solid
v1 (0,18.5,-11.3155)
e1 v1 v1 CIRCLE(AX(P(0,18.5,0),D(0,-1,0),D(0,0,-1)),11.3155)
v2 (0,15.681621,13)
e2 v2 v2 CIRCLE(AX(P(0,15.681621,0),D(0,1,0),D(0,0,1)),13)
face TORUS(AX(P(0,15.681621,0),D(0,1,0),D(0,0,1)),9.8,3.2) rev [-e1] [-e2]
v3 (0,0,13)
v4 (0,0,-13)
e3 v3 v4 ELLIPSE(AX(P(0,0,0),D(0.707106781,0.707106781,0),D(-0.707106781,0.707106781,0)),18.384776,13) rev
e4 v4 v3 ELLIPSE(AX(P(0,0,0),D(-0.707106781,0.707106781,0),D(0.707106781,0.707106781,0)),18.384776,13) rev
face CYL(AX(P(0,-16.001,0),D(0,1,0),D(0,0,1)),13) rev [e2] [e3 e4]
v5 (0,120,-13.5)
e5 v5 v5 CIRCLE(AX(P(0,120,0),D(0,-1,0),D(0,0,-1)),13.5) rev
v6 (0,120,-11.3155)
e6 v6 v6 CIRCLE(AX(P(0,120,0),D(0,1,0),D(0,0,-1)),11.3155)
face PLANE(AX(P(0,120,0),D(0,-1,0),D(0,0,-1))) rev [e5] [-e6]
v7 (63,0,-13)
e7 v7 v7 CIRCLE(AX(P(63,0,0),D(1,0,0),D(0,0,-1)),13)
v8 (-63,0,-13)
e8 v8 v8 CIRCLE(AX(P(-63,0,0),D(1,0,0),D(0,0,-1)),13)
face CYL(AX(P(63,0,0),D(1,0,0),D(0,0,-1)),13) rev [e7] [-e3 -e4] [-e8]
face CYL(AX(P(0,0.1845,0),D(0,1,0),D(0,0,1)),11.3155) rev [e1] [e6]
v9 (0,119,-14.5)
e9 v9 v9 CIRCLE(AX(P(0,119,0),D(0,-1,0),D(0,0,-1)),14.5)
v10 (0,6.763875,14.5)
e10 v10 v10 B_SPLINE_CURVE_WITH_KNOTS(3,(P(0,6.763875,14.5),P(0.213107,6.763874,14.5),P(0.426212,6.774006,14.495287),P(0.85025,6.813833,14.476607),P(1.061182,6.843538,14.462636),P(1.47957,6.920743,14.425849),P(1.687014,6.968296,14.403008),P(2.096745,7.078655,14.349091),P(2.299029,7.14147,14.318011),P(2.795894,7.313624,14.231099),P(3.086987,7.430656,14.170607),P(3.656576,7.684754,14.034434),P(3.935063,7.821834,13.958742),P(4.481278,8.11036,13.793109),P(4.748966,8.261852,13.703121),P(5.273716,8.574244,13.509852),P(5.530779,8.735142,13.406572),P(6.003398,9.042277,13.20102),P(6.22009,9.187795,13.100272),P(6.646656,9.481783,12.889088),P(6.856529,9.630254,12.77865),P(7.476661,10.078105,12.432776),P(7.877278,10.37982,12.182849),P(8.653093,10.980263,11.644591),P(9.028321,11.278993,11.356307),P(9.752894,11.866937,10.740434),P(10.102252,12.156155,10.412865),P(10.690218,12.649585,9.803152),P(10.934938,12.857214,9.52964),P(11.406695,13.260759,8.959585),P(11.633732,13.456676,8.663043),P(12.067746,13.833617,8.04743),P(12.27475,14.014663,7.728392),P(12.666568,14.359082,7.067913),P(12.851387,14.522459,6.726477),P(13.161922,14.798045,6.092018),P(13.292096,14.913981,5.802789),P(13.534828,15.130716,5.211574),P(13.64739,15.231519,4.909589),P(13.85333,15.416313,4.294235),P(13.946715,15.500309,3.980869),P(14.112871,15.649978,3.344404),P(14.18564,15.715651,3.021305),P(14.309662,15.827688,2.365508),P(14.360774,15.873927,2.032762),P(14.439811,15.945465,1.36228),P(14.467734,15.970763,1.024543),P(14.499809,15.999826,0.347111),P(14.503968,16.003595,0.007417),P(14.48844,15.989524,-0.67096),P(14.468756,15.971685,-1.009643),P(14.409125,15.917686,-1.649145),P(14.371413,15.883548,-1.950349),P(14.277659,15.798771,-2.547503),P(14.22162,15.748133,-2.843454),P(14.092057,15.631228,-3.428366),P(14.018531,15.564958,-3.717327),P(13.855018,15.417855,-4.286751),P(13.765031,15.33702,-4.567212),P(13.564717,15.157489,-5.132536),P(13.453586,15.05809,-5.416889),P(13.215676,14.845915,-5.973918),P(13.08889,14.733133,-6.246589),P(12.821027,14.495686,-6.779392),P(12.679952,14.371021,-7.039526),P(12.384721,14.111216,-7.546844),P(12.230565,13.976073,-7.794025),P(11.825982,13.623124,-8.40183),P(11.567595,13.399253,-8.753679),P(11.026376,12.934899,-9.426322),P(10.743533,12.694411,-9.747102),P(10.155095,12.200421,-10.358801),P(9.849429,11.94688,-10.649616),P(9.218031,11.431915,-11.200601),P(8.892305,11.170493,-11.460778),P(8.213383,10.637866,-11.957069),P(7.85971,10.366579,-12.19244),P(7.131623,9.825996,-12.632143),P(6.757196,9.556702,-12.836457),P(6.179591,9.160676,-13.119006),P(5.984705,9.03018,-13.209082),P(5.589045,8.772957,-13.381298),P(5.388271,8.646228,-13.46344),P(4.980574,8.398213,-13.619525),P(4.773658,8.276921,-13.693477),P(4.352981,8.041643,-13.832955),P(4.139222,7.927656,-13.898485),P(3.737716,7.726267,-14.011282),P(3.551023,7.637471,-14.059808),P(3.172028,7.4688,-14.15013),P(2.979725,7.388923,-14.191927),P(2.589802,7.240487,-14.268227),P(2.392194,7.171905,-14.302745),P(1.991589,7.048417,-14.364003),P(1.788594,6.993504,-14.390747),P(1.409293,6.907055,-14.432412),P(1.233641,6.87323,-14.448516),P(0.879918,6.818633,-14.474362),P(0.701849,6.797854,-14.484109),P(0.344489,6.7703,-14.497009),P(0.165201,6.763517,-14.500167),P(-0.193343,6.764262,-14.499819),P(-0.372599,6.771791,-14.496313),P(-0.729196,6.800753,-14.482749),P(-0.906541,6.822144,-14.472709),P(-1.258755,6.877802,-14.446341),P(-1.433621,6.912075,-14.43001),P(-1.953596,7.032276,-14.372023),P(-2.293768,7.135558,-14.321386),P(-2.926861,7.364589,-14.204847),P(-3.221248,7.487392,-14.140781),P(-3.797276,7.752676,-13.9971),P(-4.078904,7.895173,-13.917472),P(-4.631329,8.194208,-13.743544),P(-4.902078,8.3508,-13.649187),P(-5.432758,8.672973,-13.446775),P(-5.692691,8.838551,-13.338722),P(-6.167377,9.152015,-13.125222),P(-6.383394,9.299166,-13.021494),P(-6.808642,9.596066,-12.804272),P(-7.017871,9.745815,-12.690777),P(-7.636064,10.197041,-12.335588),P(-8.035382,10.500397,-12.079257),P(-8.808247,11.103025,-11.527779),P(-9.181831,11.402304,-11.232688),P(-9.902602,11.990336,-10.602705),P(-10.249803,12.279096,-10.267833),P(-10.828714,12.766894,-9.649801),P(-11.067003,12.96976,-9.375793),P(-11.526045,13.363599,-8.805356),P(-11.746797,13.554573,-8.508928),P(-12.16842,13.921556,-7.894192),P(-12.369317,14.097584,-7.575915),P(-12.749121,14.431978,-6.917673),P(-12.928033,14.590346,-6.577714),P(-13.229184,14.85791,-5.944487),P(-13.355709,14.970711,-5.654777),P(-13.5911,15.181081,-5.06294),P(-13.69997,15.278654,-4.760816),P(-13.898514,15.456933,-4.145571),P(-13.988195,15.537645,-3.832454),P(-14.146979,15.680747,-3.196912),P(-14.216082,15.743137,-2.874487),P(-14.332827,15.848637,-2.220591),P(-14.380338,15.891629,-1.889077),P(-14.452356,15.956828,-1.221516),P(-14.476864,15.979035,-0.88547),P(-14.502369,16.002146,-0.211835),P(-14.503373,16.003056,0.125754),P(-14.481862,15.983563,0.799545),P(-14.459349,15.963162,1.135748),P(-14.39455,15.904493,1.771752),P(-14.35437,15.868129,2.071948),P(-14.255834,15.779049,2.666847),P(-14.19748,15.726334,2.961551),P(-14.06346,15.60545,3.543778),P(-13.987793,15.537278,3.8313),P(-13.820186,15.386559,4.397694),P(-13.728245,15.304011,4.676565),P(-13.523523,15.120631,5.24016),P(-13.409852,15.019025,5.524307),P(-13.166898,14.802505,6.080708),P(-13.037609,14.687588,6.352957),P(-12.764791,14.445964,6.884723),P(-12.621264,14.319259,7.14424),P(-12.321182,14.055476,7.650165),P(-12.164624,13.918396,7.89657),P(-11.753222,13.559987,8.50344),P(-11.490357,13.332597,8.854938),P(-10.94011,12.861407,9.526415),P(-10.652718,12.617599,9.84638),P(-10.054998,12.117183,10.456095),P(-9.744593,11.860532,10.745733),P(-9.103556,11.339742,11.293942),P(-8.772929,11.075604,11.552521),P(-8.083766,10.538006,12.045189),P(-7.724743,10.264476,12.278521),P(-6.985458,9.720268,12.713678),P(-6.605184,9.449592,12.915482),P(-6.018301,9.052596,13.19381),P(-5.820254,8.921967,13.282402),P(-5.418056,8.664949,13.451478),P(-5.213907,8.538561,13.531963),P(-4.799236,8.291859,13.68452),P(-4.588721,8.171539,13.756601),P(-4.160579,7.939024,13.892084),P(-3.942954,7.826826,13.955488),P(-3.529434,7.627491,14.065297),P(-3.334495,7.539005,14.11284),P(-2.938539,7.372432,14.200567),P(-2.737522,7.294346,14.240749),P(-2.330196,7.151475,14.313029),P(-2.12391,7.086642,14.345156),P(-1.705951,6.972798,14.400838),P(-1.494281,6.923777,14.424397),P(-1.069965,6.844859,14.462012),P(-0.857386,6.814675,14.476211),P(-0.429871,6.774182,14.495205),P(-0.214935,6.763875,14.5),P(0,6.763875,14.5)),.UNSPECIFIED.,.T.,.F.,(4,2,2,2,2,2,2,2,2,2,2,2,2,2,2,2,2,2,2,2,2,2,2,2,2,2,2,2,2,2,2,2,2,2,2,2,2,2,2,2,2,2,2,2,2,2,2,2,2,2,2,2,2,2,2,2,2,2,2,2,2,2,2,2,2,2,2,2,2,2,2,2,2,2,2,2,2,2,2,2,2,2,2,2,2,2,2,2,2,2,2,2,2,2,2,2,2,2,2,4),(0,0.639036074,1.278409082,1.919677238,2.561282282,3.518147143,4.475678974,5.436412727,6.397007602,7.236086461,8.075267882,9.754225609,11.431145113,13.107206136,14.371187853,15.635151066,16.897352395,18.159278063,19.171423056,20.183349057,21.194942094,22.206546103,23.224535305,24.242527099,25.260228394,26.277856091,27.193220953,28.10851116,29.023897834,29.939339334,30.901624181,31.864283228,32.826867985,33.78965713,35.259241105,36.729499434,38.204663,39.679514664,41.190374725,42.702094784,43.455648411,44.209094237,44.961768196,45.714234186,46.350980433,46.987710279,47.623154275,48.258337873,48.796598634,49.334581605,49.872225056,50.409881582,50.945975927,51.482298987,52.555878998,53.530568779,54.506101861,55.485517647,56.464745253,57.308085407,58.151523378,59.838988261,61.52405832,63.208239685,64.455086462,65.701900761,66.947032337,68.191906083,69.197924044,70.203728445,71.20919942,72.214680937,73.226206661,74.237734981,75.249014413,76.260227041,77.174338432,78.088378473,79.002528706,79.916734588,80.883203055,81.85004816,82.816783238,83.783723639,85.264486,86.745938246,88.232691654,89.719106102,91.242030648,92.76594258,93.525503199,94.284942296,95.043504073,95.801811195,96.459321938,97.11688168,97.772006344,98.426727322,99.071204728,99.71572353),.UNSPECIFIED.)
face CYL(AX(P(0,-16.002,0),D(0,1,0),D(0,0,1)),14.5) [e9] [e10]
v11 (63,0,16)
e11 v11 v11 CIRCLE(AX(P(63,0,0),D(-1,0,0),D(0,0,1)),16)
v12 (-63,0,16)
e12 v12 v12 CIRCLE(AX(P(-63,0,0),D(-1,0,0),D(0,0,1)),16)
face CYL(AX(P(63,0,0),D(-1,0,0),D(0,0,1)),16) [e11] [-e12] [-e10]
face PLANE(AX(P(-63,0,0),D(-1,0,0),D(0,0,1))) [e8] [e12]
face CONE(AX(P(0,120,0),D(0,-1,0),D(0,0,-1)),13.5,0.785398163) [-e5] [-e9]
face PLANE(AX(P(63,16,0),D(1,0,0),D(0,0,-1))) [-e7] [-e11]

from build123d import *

# Parameters (mm, degrees)
SKETCH1_W                = 126
SKETCH1_H                = 16
M22_CLEARANCE_HOLE1_D    = 26
BOSS_EXTRUDE1_REACH      = 152.735
BOSS_EXTRUDE1_END_RADIUS = 16
SKETCH4_R                = 14.5
CUT_EXTRUDE1_REACH       = 122.529
CUT_EXTRUDE1_END_RADIUS  = 13
SKETCH5_R                = 13
SKETCH6_R                = 9.097381441
CUT_EXTRUDE2_DEPTH       = 0.4
CUT_EXTRUDE2_DRAFT       = -70
SKETCH7_R                = 7.998390473
CUT_EXTRUDE3_DEPTH       = 1.26
CUT_EXTRUDE3_DRAFT       = 50
SKETCH8_R                = 9.5
CUT_EXTRUDE4_DEPTH       = 30.5245
SKETCH9_R                = 11.3155
CUT_EXTRUDE5_DEPTH       = 119.8155
CHAMFER1_SIZE            = 1
FILLET1_R                = 3.2


with BuildPart() as part:
    # Sketch1 → Revolve1 (revolve)
    with BuildSketch(Plane(origin=(0, 0, 0), x_dir=(-1, 0, 0), z_dir=(0, 0, -1)), mode=Mode.PRIVATE) as revolve1_sk:
        with Locations((0, 8)):
            Rectangle(SKETCH1_W, SKETCH1_H)
    revolve(revolve1_sk.sketch.rotate(Axis((63, 0, 0), (-1, 0, 0)), 270), axis=Axis((63, 0, 0), (-1, 0, 0)))

    # M22 Clearance Hole1 (through all)
    with Locations(Plane(origin=(63, 0, 0), x_dir=(0, 0, -1), z_dir=(1, 0, 0))):
        with Locations((0, 0)):
            Hole(M22_CLEARANCE_HOLE1_D / 2)

    # Boss-Extrude1: up to this cylinder (the profile starts outside it)
    boss_extrude1_end = Plane(origin=(0, 0, 0), z_dir=(-1, 0, 0)) * Cylinder(BOSS_EXTRUDE1_END_RADIUS, 338.47, mode=Mode.PRIVATE)
    # Sketch4 → Boss-Extrude1 (add, up to the surface)
    with BuildSketch(Plane(origin=(0, 120, 0), x_dir=(1, 0, 0), z_dir=(0, 1, 0)), mode=Mode.PRIVATE) as boss_extrude1_sk1:
        with Locations(Location((0, 0, 0), (0, 0, 270))):
            Circle(SKETCH4_R)
    boss_extrude1_tool1 = extrude(boss_extrude1_sk1.sketch, amount=-BOSS_EXTRUDE1_REACH, mode=Mode.PRIVATE) - boss_extrude1_end
    add(boss_extrude1_tool1.solids().sort_by_distance((0, 120, 0))[0])

    # Cut-Extrude1: up to this cylinder (the profile starts outside it)
    cut_extrude1_end = Plane(origin=(0, 0, 0), z_dir=(1, 0, 0)) * Cylinder(CUT_EXTRUDE1_END_RADIUS, 272.058, mode=Mode.PRIVATE)
    # Sketch5 → Cut-Extrude1 (cut, up to the surface)
    with BuildSketch(Plane(origin=(0, 18.5, 0), x_dir=(1, 0, 0), z_dir=(0, 1, 0)), mode=Mode.PRIVATE) as cut_extrude1_sk1:
        with Locations(Location((0, 0, 0), (0, 0, 90))):
            Circle(SKETCH5_R)
    cut_extrude1_tool1 = extrude(cut_extrude1_sk1.sketch, amount=-CUT_EXTRUDE1_REACH, mode=Mode.PRIVATE) - cut_extrude1_end
    add(cut_extrude1_tool1.solids().sort_by_distance((0, 18.5, 0))[0], mode=Mode.SUBTRACT)


with BuildPart() as cut_extrude2_tool:
    # Sketch6 → Cut-Extrude2 (with draft: the straight prism first)
    with BuildSketch(Plane.XZ.offset(-18.5)):
        Circle(SKETCH6_R)
    extrude(amount=-CUT_EXTRUDE2_DEPTH)
    # Cut-Extrude2: the draft: its side faces are tilted about the plane it starts from
    cut_extrude2_sides = [cut_extrude2_tool.faces().sort_by_distance(p)[0] for p in [
        (-9.097381441, 18.7, 0),
    ]]
    draft(cut_extrude2_sides, Plane.XZ.offset(-18.5), CUT_EXTRUDE2_DRAFT)


with BuildPart() as part_1:
    add(part.part)

    # Cut-Extrude2: cut by cut_extrude2_tool
    add(cut_extrude2_tool.part, mode=Mode.SUBTRACT)


with BuildPart() as cut_extrude3_tool:
    # Sketch7 → Cut-Extrude3 (with draft: the straight prism first)
    with BuildSketch(Plane.XZ.offset(-18.9)):
        Circle(SKETCH7_R)
    extrude(amount=-CUT_EXTRUDE3_DEPTH)
    # Cut-Extrude3: the draft: its side faces are tilted about the plane it starts from
    cut_extrude3_sides = [cut_extrude3_tool.faces().sort_by_distance(p)[0] for p in [
        (-7.998390473, 19.53, 0),
    ]]
    draft(cut_extrude3_sides, Plane.XZ.offset(-18.9), CUT_EXTRUDE3_DRAFT)


with BuildPart() as part_2:
    add(part_1.part)

    # Cut-Extrude3: cut by cut_extrude3_tool
    add(cut_extrude3_tool.part, mode=Mode.SUBTRACT)

    # Sketch8 → Cut-Extrude4 (cut)
    with BuildSketch(Plane.XZ.offset(-20.16)):
        with Locations(Location((0, 0, 0), (0, 0, 90))):
            Circle(SKETCH8_R)
    extrude(amount=-CUT_EXTRUDE4_DEPTH, mode=Mode.SUBTRACT)

    # Sketch9 → Cut-Extrude5 (cut)
    with BuildSketch(Plane(origin=(0, 120, 0), x_dir=(-1, 0, 0), z_dir=(0, 1, 0))):
        with Locations(Location((0, 0, 0), (0, 0, 270))):
            Circle(SKETCH9_R)
    extrude(amount=-CUT_EXTRUDE5_DEPTH, mode=Mode.SUBTRACT)

    # Chamfer1
    chamfer1_edges = [part_2.edges().sort_by_distance(p)[0] for p in [
        (0, 120, -14.5),
    ]]
    chamfer(chamfer1_edges, length=CHAMFER1_SIZE)

    # Fillet1
    # the kernel refuses this fillet: 3.2 mm, written as the material it adds along each edge
    with BuildSketch(Plane(origin=(0, 18.5, 0), x_dir=(0, 0, -1), z_dir=(1, 0, 0))) as fillet1_piece_1:
        with BuildLine():
            CenterArc((9.8, -2.818378922), FILLET1_R, 0, 61.73217134)
            Line((13, -2.818378922), (13.064, -2.818378922))
            Line((13.064, -2.818378922), (13.064, 0))
            Line((13.064, 0), (13, 0.064))
            ThreePointArc((13, 0.064), (12.15775, 0.064), (11.34581, 0.056367578))
            Line((11.34581, 0.056367578), (11.3155, 0))
        make_face()
    revolve(axis=Axis((0, 18.5, 0), (0, 1, 0)))


solid = part_2.part
